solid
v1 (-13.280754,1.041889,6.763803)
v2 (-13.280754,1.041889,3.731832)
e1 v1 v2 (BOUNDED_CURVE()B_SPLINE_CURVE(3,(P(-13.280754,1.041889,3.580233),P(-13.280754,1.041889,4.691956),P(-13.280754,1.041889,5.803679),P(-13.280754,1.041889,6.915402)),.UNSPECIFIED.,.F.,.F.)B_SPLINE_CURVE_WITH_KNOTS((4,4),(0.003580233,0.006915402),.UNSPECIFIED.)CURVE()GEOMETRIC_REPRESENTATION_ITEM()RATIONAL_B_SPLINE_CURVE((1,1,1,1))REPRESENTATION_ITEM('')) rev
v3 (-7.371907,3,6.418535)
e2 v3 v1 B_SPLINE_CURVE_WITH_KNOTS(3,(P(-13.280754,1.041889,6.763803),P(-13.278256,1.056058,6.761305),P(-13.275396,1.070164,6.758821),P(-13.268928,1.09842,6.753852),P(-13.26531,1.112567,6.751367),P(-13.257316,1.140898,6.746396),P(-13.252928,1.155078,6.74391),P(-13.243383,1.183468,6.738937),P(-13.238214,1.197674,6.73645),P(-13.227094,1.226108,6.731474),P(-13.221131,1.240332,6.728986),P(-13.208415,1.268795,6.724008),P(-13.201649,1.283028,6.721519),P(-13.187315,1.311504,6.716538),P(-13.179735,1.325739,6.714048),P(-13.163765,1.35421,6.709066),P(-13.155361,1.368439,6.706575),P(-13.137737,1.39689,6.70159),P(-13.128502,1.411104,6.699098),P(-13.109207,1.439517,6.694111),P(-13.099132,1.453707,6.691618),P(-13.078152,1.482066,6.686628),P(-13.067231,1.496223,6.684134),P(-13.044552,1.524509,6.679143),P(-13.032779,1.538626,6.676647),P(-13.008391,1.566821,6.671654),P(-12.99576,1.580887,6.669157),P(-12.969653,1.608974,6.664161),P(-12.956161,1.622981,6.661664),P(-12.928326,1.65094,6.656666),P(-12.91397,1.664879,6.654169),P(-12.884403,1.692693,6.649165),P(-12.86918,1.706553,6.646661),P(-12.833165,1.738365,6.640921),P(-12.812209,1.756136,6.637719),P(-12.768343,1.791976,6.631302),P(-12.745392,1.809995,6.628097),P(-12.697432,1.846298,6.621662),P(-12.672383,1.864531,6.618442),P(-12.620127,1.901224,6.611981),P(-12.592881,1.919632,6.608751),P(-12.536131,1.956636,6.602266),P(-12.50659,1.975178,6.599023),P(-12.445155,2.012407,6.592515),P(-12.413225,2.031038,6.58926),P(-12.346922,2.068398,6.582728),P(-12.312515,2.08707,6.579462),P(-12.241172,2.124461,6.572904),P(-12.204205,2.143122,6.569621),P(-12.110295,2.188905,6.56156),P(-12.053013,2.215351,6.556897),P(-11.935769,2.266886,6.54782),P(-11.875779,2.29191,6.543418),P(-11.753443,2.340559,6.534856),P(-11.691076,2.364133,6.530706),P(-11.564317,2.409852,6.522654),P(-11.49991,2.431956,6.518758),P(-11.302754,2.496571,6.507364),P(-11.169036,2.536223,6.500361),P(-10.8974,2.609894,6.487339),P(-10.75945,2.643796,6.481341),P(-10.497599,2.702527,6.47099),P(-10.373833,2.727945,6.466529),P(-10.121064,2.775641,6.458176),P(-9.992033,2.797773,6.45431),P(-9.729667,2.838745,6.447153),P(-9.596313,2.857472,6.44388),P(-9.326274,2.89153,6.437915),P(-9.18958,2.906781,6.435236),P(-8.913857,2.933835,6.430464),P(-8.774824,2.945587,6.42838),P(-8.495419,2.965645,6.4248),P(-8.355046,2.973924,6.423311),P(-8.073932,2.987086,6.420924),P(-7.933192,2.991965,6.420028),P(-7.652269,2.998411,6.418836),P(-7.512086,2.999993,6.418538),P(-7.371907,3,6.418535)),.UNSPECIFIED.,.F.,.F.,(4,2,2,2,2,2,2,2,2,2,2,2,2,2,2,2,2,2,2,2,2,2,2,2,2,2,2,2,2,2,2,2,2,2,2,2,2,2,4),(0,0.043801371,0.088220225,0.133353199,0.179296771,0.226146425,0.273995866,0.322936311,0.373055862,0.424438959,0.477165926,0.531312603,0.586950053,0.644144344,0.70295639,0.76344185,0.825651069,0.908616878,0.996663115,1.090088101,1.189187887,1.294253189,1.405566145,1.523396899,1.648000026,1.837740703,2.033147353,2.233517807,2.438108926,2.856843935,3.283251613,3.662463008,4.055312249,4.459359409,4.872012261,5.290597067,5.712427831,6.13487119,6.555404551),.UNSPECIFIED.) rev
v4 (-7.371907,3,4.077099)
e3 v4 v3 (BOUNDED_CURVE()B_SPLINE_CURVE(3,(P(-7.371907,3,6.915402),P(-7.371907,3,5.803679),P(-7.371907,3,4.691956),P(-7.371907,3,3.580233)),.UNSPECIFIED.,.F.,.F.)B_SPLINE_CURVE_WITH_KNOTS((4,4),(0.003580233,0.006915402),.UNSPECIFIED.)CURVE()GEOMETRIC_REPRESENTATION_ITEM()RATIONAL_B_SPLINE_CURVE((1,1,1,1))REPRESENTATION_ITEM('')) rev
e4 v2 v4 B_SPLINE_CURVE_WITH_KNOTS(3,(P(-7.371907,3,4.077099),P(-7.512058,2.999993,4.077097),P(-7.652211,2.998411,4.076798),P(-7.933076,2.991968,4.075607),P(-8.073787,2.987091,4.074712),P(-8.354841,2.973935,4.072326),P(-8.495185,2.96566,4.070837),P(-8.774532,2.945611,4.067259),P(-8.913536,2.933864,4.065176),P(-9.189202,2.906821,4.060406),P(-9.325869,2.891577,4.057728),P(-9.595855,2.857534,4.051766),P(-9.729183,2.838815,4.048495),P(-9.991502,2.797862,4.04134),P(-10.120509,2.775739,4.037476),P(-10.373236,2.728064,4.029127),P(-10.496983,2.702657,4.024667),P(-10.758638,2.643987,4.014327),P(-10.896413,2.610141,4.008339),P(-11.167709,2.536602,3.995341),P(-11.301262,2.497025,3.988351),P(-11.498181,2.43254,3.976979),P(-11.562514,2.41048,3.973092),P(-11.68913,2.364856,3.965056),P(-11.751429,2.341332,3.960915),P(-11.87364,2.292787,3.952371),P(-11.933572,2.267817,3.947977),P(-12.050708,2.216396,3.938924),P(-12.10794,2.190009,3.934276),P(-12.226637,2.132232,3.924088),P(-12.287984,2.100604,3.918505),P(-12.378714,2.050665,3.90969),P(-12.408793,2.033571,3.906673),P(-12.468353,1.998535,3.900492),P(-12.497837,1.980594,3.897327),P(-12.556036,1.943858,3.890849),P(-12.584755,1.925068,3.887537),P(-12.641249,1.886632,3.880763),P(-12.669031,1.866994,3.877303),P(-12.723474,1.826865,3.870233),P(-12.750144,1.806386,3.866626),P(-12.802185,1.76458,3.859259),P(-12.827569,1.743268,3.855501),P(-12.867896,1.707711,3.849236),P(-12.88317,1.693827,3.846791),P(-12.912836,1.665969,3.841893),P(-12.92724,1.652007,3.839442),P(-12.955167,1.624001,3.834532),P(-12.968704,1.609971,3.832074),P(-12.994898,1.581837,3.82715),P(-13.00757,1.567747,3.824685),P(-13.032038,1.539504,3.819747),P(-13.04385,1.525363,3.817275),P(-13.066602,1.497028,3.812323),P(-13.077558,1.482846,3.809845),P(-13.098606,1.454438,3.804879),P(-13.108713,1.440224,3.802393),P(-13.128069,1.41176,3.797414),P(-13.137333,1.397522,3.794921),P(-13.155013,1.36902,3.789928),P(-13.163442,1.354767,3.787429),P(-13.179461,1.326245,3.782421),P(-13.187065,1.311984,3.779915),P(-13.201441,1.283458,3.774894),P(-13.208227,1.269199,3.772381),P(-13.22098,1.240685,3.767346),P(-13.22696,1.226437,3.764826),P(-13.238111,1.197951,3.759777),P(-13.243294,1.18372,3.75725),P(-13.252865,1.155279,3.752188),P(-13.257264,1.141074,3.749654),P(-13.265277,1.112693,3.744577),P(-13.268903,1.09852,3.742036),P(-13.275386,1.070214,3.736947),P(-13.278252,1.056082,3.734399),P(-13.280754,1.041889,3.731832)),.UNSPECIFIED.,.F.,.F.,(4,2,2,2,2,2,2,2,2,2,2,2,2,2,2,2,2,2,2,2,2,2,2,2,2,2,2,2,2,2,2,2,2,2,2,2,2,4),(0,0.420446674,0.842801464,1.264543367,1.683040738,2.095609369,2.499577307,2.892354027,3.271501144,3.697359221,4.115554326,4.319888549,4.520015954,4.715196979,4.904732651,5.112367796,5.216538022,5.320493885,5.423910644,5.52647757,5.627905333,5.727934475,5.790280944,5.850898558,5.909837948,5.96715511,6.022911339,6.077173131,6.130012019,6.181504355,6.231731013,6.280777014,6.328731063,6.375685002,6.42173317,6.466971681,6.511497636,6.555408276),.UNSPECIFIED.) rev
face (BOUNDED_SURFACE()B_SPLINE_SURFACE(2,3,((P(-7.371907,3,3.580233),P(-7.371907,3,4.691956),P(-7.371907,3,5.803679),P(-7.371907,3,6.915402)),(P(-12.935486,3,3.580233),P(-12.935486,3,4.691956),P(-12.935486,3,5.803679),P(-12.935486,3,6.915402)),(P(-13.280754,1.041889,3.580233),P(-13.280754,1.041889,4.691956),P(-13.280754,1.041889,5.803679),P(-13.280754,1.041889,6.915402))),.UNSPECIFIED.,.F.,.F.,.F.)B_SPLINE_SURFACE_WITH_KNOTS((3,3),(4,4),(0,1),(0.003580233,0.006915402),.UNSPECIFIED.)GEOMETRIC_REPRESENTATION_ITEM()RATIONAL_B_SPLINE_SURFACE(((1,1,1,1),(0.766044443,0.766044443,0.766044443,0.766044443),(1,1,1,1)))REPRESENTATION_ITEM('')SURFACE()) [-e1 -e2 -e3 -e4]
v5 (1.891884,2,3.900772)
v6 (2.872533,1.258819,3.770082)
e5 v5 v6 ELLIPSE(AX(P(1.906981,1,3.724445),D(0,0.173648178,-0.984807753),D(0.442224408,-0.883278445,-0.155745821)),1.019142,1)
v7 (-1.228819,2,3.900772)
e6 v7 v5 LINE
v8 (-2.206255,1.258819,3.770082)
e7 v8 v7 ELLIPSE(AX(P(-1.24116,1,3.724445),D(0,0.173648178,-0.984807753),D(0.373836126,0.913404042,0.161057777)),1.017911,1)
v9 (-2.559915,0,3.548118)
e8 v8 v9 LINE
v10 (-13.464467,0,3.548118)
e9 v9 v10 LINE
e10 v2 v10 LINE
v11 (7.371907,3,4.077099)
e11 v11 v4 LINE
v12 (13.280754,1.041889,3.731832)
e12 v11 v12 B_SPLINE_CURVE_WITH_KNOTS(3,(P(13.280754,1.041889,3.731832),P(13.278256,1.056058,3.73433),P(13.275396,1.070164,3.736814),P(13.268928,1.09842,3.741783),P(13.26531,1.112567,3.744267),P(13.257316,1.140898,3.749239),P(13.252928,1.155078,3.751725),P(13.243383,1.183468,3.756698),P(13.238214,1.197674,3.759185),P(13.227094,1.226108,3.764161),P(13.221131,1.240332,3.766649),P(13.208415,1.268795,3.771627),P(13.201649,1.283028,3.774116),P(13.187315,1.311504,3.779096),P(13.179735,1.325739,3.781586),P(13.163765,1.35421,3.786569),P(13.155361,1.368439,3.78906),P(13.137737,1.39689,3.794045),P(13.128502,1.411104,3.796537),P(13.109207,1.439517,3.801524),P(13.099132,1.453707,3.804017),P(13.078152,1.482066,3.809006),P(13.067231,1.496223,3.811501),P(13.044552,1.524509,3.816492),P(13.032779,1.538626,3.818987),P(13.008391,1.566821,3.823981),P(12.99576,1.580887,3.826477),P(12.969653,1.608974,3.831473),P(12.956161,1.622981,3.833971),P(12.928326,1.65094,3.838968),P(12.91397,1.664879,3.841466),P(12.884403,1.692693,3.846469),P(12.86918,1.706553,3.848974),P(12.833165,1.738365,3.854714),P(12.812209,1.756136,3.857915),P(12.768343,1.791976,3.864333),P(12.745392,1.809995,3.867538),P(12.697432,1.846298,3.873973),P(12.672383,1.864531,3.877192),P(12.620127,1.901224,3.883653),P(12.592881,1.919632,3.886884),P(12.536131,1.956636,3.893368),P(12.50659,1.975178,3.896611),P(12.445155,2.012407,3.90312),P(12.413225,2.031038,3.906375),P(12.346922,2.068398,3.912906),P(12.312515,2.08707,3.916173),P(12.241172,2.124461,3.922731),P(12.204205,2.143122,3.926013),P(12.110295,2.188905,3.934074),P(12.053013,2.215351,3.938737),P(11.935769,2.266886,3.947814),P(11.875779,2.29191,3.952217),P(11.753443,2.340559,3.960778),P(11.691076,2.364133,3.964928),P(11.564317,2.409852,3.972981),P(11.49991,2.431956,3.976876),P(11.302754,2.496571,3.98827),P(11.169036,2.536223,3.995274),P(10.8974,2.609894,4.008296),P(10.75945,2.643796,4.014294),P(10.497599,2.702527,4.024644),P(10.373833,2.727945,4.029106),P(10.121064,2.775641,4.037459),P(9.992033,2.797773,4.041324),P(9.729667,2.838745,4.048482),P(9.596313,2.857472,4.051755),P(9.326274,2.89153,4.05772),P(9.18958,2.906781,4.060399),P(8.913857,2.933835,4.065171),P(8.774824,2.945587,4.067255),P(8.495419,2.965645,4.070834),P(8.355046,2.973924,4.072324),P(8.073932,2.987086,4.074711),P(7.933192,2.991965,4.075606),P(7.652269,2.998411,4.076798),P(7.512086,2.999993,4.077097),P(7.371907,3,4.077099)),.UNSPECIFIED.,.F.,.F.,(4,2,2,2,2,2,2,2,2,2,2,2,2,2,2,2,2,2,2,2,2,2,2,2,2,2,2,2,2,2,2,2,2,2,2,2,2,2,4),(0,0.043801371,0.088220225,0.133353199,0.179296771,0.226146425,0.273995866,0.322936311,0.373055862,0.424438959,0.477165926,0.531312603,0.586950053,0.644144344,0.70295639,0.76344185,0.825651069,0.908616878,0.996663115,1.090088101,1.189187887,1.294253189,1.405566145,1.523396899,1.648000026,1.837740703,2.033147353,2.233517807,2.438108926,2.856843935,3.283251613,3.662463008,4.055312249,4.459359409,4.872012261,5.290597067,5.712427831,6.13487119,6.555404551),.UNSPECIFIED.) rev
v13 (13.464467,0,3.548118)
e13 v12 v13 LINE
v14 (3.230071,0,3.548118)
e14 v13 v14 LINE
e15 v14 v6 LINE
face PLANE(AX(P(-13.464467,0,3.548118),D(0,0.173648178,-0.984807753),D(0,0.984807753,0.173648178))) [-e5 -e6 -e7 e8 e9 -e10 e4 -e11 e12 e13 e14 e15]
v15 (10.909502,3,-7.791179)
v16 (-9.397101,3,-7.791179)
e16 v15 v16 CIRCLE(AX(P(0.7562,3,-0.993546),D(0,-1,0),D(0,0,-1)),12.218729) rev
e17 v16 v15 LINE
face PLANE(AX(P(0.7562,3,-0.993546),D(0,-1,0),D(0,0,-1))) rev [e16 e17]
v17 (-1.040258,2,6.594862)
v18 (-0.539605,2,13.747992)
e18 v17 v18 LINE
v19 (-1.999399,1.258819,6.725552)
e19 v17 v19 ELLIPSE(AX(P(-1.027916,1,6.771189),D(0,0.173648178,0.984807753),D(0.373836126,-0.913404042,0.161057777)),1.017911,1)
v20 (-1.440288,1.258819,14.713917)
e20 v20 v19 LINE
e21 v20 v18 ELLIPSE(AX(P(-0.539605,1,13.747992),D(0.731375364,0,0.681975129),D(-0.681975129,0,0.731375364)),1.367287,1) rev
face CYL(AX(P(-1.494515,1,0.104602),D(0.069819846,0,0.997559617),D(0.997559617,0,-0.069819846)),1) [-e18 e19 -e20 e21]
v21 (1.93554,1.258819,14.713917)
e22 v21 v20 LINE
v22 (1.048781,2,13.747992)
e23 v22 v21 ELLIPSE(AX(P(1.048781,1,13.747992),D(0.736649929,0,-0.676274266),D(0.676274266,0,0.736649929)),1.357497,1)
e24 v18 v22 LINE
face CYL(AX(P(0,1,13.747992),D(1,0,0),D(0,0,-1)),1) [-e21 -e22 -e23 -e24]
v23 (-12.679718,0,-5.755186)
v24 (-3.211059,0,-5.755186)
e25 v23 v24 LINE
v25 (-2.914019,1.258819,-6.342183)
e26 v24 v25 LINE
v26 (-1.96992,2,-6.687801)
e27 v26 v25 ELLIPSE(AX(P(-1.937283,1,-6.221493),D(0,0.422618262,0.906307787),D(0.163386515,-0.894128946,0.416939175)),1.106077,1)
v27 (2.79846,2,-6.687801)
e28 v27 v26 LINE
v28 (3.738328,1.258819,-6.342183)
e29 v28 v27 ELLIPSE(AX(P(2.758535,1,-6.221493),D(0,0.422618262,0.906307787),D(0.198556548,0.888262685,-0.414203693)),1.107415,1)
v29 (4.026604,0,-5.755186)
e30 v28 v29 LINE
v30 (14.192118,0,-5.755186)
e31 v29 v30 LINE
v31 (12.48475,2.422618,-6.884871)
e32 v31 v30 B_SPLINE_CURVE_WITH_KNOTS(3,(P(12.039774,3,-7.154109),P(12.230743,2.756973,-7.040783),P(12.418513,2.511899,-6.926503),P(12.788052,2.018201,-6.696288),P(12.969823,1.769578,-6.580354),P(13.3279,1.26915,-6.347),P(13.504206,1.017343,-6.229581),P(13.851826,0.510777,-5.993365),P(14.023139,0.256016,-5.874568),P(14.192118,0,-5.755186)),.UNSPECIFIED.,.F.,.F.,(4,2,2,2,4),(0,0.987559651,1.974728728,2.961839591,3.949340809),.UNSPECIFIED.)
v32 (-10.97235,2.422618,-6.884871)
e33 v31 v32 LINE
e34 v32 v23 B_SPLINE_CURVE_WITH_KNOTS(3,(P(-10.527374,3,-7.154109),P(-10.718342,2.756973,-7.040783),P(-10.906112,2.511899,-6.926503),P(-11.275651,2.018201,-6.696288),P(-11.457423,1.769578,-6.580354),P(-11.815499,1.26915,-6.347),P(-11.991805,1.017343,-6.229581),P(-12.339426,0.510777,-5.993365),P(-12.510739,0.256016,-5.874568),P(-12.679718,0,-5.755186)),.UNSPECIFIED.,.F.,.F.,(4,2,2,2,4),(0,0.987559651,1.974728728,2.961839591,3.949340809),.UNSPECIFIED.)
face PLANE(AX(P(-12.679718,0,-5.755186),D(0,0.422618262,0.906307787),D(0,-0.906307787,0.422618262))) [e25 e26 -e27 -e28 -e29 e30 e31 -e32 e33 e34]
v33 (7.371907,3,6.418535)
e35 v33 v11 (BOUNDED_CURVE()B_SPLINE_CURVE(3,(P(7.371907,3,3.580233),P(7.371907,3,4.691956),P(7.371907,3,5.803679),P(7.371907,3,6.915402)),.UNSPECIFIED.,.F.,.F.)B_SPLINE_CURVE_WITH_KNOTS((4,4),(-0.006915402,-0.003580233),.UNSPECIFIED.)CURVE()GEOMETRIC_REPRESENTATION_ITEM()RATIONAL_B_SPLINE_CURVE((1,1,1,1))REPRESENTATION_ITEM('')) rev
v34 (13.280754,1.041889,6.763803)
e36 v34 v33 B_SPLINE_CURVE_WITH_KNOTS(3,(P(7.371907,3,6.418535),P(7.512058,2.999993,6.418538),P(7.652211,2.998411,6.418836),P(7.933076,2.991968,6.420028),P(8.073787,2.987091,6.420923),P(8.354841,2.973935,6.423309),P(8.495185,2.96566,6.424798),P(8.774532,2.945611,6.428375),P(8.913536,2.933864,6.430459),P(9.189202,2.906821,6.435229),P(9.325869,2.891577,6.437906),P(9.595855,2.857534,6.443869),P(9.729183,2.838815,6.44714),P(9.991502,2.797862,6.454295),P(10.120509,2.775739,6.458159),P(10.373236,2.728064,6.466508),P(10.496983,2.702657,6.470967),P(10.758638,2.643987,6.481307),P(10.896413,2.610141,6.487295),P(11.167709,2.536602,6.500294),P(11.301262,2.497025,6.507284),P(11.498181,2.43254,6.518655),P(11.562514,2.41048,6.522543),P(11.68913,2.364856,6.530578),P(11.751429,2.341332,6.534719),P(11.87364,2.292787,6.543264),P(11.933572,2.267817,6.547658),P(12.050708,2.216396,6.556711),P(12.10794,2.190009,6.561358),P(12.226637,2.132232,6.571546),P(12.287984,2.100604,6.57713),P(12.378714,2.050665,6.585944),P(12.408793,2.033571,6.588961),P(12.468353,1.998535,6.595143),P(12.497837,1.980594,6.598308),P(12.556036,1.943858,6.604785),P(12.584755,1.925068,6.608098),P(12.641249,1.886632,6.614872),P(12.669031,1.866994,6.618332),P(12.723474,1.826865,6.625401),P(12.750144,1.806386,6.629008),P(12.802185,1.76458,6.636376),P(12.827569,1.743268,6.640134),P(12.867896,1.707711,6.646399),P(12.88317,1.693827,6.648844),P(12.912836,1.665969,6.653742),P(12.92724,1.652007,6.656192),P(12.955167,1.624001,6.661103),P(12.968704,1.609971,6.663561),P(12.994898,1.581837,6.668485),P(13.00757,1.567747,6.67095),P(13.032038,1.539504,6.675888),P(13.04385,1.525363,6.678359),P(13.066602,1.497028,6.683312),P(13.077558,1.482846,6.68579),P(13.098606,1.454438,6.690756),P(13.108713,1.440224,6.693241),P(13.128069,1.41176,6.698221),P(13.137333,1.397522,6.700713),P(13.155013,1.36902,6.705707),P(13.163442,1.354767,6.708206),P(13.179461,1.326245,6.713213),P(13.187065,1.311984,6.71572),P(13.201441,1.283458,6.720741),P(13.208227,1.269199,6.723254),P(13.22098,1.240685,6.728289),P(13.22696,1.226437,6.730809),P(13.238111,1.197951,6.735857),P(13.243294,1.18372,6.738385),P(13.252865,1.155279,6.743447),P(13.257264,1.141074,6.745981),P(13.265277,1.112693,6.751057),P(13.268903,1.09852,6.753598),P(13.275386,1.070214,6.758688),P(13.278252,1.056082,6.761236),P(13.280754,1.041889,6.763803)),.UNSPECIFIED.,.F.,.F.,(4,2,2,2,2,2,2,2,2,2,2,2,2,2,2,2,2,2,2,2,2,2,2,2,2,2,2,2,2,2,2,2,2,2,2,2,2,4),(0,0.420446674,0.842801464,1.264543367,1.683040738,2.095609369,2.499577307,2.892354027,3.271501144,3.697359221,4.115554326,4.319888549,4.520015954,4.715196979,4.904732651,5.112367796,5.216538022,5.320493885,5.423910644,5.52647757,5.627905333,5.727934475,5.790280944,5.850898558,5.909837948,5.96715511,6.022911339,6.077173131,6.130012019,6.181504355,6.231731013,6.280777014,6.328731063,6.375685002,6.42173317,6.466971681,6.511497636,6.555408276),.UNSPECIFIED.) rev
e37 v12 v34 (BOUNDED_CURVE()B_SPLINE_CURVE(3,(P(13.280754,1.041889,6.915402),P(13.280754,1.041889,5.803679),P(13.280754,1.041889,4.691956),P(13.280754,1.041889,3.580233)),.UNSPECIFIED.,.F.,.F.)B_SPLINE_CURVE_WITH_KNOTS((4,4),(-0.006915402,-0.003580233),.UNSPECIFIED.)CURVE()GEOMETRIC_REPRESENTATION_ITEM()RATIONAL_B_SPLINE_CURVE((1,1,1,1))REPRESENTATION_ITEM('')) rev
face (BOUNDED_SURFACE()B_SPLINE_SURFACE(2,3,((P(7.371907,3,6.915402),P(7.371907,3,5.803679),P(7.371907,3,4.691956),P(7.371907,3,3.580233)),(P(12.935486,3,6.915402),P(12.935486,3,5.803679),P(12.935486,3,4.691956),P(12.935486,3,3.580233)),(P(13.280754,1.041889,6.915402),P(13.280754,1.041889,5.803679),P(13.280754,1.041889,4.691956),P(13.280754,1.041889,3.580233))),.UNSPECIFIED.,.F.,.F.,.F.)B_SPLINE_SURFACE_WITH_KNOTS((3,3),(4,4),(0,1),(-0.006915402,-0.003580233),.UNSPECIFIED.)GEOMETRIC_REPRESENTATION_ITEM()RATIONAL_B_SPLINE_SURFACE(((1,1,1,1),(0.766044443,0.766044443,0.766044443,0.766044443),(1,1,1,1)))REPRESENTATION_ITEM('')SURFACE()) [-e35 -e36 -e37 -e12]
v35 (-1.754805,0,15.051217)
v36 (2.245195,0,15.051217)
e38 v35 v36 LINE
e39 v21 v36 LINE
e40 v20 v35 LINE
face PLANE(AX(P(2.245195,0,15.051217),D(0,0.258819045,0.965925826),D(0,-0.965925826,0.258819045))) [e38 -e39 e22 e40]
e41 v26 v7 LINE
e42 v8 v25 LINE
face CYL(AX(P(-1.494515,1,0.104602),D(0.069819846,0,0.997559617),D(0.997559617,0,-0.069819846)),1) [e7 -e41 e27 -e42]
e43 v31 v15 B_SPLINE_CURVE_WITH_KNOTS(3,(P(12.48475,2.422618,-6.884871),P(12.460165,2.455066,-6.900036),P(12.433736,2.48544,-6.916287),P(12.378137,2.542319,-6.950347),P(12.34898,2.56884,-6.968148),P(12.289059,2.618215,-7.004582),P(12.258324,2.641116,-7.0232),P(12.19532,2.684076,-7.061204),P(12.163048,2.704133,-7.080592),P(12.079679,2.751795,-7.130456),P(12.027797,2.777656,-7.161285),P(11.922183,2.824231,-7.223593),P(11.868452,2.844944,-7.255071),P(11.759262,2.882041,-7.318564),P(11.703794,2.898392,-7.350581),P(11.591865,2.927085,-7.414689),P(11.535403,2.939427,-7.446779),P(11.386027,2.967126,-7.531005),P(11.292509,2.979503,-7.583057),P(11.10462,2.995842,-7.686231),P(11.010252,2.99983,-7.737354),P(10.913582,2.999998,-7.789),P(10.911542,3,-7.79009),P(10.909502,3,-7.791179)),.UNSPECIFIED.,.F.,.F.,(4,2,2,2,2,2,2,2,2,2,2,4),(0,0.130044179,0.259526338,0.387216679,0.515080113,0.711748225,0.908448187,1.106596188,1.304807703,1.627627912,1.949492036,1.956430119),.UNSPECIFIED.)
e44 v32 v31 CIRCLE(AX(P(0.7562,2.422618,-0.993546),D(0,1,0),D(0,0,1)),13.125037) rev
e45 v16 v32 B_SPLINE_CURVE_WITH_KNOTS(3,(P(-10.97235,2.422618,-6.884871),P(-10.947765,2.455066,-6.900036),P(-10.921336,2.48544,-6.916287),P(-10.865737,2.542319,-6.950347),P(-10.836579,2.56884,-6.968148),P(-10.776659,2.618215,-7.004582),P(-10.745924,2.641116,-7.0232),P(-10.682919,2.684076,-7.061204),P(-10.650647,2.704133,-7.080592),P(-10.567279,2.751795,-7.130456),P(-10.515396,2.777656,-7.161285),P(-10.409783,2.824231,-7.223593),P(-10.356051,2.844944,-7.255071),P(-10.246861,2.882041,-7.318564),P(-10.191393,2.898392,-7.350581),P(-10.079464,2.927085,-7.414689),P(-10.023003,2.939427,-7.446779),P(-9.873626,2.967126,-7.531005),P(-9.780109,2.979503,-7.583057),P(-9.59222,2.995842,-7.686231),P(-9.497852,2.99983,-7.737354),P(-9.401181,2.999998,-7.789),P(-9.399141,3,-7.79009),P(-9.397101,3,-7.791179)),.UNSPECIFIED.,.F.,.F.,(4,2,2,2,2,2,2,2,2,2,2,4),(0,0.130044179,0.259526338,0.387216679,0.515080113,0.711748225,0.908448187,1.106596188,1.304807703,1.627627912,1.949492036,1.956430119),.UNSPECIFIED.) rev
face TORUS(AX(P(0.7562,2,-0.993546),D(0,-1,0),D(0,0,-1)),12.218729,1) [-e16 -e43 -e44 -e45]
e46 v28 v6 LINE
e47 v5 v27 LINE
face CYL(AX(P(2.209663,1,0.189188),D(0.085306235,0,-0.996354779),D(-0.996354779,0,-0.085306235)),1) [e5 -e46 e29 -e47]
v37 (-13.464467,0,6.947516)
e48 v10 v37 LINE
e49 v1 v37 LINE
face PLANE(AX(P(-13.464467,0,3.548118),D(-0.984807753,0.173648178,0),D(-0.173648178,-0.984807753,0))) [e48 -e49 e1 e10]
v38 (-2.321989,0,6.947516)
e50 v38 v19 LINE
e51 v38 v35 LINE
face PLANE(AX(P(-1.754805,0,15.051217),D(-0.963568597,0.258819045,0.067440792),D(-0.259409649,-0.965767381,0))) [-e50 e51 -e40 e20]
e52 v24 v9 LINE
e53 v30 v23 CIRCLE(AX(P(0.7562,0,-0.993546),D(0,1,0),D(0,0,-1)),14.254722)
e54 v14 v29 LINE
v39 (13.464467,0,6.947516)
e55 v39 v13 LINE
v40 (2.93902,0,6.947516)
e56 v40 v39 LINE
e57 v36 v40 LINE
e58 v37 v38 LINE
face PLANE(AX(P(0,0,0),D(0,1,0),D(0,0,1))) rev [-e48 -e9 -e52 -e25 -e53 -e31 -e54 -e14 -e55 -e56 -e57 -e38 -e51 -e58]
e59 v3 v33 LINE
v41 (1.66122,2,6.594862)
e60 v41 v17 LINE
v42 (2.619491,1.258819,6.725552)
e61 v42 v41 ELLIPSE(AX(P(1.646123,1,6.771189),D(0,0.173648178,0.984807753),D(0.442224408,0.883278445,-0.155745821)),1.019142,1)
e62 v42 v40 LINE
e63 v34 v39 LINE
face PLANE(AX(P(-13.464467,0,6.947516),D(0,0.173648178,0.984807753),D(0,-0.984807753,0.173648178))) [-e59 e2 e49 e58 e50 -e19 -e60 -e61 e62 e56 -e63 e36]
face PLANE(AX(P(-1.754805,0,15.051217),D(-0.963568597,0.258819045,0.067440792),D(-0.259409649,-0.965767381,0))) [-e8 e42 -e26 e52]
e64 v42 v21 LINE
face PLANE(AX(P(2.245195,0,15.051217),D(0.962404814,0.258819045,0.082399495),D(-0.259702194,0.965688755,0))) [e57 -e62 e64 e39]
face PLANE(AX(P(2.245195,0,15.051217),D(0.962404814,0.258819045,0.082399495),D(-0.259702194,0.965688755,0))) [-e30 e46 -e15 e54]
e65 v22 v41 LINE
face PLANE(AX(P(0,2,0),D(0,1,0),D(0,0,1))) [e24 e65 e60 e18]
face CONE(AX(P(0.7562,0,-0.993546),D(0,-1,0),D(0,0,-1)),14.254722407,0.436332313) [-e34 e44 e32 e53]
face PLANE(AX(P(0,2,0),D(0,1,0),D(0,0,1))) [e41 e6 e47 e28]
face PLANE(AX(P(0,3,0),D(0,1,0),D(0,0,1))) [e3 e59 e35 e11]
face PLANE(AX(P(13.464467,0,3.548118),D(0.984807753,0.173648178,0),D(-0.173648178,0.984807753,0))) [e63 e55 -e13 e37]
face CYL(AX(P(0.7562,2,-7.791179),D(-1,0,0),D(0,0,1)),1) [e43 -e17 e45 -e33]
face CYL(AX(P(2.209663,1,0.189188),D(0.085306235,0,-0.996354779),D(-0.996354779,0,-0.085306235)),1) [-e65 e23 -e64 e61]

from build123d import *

# Parameters (mm, degrees)
BOSS_EXTRUDE1_DEPTH = 2
BOSS_EXTRUDE1_TAPER = 15
FILLET1_R           = 1
BOSS_EXTRUDE2_DEPTH = 3
BOSS_EXTRUDE2_DRAFT = 25
FILLET2_R           = 1
SKETCH4_W           = 26.928933456
SKETCH4_H           = 3.399397771
BOSS_EXTRUDE3_DEPTH = 3
BOSS_EXTRUDE3_TAPER = 10
FILLET3_START       = 3.548118457
FILLET3_DEPTH       = 3.399397771


with BuildPart() as part:
    # Sketch2 → Boss-Extrude1 (new body)
    with BuildSketch(Plane(origin=(0, 0, 0), x_dir=(1, 0, 0), z_dir=(0, 1, 0))):
        Polygon((2.245194627, -15.051216937), (4.446052988, 10.654239994), (-3.553947012, 10.654239994), (-1.754805373, -15.051216937), align=None)
    extrude(amount=BOSS_EXTRUDE1_DEPTH, taper=BOSS_EXTRUDE1_TAPER)

    # Fillet1
    fillet1_edges = [part.edges().sort_by_distance(p)[0] for p in [
        (2.807764808, 2, 2.198488472),
        (0.441540754, 2, -10.118341609),
        (-2.117166811, 2, 2.198488472),
        (0.249057243, 2, 14.515318552),
    ]]
    fillet(fillet1_edges, radius=FILLET1_R)


with BuildPart() as boss_extrude2_tool:
    # Sketch3 → Boss-Extrude2 (with draft: the straight prism first)
    with BuildSketch(Plane(origin=(0, 0, 0), x_dir=(1, 0, 0), z_dir=(0, 1, 0))):
        with BuildLine():
            Line((-12.679718033, 5.755185759), (14.192118481, 5.755185759))
            ThreePointArc((14.192118481, 5.755185759), (0.756200224, 15.248268586), (-12.679718033, 5.755185759))
        make_face()
    extrude(amount=BOSS_EXTRUDE2_DEPTH)
    # Boss-Extrude2: the draft: its side faces are tilted about the plane it starts from
    boss_extrude2_sides = [boss_extrude2_tool.faces().sort_by_distance(p)[0] for p in [
        (0.756200224, 1.5, -5.755185759),
        (0.756200224, 1.5, -15.248268586),
    ]]
    draft(boss_extrude2_sides, Plane(origin=(0, 0, 0), x_dir=(1, 0, 0), z_dir=(0, 1, 0)), BOSS_EXTRUDE2_DRAFT)


with BuildPart() as part_1:
    add(part.part)

    # Boss-Extrude2: add boss_extrude2_tool
    add(boss_extrude2_tool.part)

    # Fillet2
    fillet2_edges = [part_1.edges().sort_by_distance(p)[0] for p in [
        (0.756200224, 3, -7.154108734),
        (0.756200224, 3, -13.849345612),
    ]]
    fillet(fillet2_edges, radius=FILLET2_R)

    # Sketch4 → Boss-Extrude3 (add)
    with BuildSketch(Plane(origin=(0, 0, 0), x_dir=(1, 0, 0), z_dir=(0, 1, 0))):
        with Locations((0, -5.247817343)):
            Rectangle(SKETCH4_W, SKETCH4_H)
    extrude(amount=BOSS_EXTRUDE3_DEPTH, taper=BOSS_EXTRUDE3_TAPER)

    # Fillet3: read off the stored shape, not the designer's step
    # Fillet3 outline → Fillet3 (cut)
    with BuildSketch(Plane.XY.offset(FILLET3_START)):
        with BuildLine():
            Line((12.935485786, 3), (7.371907057, 3))
            add(Edge.make_bspline(
                [(7.371907057, 3), (12.935485786, 3), (13.280753575, 1.041889066)],
                knots=[0, 0, 0, 1, 1, 1], degree=2, weights=[1, 0.766044443, 1]))
            Line((13.280753575, 1.041889066), (12.935485786, 3))
        make_face()
        with BuildLine():
            add(Edge.make_bspline(
                [(-7.371907057, 3), (-12.935485786, 3), (-13.280753575, 1.041889066)],
                knots=[0, 0, 0, 1, 1, 1], degree=2, weights=[1, 0.766044443, 1]))
            Line((-7.371907057, 3), (-12.935485786, 3))
            Line((-12.935485786, 3), (-13.280753575, 1.041889066))
        make_face()
    extrude(amount=FILLET3_DEPTH, mode=Mode.SUBTRACT)


solid = part_1.part
